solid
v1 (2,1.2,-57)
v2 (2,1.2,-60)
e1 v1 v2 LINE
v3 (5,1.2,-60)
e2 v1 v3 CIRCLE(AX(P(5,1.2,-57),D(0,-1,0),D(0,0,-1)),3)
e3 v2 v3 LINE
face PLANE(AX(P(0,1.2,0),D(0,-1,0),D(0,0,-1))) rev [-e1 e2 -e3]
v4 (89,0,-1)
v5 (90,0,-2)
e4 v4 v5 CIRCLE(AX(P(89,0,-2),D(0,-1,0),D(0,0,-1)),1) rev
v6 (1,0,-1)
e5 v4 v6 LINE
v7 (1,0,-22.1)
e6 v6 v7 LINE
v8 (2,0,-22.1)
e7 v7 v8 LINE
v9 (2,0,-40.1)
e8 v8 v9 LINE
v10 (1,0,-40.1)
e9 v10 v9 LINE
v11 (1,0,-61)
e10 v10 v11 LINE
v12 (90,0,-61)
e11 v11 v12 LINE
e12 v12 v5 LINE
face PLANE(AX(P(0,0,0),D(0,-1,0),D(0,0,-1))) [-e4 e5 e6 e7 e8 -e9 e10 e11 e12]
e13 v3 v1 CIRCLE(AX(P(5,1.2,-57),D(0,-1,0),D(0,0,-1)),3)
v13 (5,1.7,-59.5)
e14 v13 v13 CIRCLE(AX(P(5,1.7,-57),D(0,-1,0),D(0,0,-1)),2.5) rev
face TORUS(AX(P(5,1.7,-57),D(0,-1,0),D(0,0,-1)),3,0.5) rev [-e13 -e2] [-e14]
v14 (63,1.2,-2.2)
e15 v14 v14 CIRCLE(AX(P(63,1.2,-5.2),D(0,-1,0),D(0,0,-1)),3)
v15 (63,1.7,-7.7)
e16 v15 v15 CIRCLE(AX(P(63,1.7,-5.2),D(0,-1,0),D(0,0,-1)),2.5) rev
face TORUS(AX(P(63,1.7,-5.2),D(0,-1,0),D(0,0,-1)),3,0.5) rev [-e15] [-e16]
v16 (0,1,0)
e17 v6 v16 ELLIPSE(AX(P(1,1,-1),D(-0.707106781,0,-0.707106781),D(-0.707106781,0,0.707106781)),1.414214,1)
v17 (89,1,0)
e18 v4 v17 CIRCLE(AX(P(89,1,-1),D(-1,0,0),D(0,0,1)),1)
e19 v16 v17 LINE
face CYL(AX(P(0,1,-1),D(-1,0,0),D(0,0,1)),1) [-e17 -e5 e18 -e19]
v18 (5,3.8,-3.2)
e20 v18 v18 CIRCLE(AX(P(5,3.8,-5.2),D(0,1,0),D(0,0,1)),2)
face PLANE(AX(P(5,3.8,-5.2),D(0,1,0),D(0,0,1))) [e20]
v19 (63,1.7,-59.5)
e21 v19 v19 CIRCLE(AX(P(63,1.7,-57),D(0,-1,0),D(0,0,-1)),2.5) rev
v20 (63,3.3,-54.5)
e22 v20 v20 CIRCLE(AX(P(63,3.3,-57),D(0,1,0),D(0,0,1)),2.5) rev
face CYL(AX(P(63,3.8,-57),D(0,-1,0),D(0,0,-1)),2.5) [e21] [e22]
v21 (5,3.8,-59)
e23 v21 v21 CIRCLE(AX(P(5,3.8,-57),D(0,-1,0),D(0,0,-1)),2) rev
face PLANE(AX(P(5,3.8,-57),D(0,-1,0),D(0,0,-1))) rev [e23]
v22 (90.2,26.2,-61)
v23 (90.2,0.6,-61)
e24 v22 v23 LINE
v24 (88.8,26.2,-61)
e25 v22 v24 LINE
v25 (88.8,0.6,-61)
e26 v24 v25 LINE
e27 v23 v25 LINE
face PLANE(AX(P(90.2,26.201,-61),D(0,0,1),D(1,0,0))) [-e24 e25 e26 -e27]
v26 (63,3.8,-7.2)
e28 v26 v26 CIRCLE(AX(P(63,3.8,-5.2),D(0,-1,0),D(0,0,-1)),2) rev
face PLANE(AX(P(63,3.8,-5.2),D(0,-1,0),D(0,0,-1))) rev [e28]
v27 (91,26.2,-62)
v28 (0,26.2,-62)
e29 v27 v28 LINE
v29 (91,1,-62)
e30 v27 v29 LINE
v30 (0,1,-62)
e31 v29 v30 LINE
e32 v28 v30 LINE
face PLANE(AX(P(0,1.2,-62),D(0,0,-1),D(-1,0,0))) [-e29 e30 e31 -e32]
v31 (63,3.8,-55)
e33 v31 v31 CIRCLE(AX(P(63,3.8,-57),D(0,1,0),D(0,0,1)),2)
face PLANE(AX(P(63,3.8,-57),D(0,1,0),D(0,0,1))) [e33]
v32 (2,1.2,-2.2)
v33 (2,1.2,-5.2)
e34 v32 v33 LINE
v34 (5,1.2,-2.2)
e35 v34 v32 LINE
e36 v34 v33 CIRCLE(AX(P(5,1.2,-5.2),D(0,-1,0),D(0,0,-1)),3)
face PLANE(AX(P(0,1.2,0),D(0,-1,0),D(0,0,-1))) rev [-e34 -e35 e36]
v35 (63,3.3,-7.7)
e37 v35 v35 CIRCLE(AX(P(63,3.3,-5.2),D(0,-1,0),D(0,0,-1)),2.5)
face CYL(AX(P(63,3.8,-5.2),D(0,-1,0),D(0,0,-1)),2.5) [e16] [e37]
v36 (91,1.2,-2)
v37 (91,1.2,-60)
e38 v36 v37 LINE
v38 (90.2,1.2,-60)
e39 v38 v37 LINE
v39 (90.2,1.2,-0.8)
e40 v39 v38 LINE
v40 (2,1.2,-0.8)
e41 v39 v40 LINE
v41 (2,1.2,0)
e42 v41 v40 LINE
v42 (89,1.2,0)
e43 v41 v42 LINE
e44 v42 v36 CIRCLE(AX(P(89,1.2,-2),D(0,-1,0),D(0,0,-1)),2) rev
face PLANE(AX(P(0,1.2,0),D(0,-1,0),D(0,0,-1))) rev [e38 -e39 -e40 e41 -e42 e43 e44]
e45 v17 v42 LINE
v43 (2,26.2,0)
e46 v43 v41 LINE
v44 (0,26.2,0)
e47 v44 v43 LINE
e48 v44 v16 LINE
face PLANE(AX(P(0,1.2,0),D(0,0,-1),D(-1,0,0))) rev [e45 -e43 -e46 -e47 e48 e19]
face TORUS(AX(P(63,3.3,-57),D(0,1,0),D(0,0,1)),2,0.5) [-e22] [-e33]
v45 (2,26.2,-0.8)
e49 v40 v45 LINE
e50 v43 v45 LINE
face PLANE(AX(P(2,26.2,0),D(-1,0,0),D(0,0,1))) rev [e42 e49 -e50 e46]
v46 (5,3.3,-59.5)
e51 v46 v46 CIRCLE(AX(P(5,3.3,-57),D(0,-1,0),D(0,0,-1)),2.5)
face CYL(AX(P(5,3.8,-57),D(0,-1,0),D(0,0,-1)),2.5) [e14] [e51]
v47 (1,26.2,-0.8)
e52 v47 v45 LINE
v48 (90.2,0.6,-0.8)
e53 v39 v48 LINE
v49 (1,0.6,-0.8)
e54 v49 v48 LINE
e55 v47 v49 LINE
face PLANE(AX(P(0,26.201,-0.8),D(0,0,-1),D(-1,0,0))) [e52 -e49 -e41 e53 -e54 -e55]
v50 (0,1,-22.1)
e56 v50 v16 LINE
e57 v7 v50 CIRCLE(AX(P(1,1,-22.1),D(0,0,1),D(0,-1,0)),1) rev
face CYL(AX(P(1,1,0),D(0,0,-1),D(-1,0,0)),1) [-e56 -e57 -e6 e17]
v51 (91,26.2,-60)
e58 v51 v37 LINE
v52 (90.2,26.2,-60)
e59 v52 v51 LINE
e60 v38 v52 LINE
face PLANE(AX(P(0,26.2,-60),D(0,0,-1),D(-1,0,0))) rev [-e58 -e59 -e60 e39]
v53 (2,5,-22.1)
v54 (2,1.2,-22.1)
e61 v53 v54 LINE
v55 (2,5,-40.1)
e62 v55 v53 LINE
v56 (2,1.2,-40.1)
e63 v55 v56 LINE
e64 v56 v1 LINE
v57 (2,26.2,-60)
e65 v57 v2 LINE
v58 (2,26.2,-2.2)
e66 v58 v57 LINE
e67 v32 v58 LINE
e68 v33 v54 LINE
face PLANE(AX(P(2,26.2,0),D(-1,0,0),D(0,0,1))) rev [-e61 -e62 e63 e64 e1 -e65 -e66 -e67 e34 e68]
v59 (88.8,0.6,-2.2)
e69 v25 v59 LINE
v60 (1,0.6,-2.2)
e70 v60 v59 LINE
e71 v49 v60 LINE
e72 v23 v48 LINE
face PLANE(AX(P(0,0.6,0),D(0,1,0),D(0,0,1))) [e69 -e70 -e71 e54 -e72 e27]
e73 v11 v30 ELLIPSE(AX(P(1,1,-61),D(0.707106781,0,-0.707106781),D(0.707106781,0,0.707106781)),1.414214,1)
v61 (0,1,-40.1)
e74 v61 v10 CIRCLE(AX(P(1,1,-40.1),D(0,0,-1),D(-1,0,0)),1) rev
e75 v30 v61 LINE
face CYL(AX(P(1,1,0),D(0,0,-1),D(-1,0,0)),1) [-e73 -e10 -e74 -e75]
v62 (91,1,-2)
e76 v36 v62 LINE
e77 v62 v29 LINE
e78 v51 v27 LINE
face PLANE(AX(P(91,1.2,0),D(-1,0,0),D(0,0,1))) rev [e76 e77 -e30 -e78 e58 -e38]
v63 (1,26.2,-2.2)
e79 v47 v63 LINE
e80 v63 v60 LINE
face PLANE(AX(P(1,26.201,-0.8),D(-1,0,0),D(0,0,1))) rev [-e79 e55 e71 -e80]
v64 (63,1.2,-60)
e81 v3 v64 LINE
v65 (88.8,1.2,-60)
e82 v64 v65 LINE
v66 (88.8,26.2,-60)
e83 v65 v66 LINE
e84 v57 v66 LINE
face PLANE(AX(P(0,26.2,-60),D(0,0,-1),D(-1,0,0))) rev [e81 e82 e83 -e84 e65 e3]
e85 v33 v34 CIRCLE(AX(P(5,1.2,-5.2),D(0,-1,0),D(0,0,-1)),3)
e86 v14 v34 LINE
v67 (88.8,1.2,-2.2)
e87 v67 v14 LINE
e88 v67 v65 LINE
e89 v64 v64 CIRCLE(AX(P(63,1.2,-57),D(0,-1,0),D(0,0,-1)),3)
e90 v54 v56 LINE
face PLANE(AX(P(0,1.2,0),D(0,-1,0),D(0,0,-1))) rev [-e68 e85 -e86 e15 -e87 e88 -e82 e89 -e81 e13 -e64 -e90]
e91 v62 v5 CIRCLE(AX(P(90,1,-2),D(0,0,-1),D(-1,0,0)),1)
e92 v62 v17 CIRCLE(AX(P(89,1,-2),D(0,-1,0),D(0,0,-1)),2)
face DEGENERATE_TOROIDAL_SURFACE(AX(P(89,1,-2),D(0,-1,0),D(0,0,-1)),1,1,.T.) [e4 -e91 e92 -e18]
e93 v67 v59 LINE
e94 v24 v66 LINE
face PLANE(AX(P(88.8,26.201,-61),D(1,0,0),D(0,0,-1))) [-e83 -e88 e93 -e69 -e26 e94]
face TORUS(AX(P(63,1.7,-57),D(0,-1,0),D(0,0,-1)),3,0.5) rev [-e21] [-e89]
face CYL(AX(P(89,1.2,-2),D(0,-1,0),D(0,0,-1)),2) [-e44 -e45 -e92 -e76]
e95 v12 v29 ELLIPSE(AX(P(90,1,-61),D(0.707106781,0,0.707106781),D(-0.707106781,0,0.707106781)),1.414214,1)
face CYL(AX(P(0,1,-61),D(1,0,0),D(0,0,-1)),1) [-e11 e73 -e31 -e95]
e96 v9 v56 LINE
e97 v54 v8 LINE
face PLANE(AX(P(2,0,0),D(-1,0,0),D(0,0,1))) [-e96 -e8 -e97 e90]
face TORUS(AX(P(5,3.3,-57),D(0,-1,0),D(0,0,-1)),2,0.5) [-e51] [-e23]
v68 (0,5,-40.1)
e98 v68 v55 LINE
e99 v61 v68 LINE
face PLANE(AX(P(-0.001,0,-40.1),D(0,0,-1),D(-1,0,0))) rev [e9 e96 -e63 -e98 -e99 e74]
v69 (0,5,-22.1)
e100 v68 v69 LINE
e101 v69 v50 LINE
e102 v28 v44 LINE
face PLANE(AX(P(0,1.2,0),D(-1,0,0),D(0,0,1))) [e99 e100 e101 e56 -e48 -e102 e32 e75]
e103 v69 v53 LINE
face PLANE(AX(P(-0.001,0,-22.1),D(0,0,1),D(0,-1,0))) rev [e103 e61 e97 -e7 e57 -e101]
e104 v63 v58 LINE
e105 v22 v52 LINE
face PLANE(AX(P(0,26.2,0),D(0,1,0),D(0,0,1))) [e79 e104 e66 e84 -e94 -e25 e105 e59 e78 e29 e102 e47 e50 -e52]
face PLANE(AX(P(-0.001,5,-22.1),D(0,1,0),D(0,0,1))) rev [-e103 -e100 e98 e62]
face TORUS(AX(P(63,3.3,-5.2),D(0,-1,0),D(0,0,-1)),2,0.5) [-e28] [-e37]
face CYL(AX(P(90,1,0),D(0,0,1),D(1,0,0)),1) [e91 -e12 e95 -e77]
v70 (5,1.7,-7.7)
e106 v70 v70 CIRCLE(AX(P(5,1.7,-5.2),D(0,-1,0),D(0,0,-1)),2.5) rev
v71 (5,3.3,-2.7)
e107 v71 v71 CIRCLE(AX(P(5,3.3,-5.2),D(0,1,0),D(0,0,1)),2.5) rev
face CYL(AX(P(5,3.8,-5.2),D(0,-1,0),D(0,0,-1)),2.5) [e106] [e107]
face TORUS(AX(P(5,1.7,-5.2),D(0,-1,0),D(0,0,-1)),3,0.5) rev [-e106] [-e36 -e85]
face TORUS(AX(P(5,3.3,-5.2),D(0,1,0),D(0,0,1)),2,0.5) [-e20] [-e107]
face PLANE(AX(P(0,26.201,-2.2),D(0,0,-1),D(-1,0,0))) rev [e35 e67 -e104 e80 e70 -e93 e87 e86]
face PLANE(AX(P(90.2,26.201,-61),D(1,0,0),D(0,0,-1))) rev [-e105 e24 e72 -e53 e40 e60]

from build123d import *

# Parameters (mm, degrees)
SKICA1_W                 = 91
SKICA1_H                 = 62
P_IDAT_VYSUNUT_M5_DEPTH  = 1.2
P_IDAT_VYSUNUT_M8_DEPTH  = 25
ODEBRAT_START            = -0.6
SKICA13_W                = 87.8
SKICA13_H                = 1.4
ODEBRAT_VYSUNUT_M2_DEPTH = 25.6
CUT_EXTRUDE2_REACH       = 113.586
SKETCH2_W                = 18
SKETCH2_H                = 5
SKETCH4_R                = 2.5
ODEBRAT_VYSUNUT_M6_DEPTH = 0.4
BOSS_EXTRUDE3_START      = 3
SKETCH17_R               = 2.5
BOSS_EXTRUDE3_DEPTH      = 3
FILLET24_R               = 0.5
FILLET25_R               = 0.5
FILLET2_R                = 1
FILLET5_R                = 2


# Some blends are built 0.0001 mm under size
with BuildPart() as part:
    # Skica1 → Přidat vysunutím5 (new body)
    with BuildSketch(Plane(origin=(0, 0, 0), x_dir=(1, 0, 0), z_dir=(0, 1, 0))):
        with Locations((45.5, 31)):
            Rectangle(SKICA1_W, SKICA1_H)
    extrude(amount=P_IDAT_VYSUNUT_M5_DEPTH)

    # Skica5 → Přidat vysunutím8 (add)
    with BuildSketch(Plane(origin=(0, 1.2, 0), x_dir=(1, 0, 0), z_dir=(0, 1, 0))):
        Polygon((0, 62), (0, 0), (2, 0), (2, 60), (91, 60), (91, 62), align=None)
    extrude(amount=P_IDAT_VYSUNUT_M8_DEPTH)

    # Skica13 → Odebrat vysunutím2 (cut)
    with BuildSketch(Plane(origin=(0, 1.2, 0), x_dir=(1, 0, 0), z_dir=(0, 1, 0)).offset(ODEBRAT_START)):
        with Locations((44.9, 1.5)):
            Rectangle(SKICA13_W, SKICA13_H)
        Polygon((88.8, 2.2), (88.8, 0.8), (90.2, 0.8), (90.2, 61), (88.8, 61), align=None)
    extrude(amount=ODEBRAT_VYSUNUT_M2_DEPTH, mode=Mode.SUBTRACT)

    # Sketch2 → Cut-Extrude2 (cut, up to next)
    with BuildSketch(Plane(origin=(2, 0, 0), x_dir=(0, 0, -1), z_dir=(1, 0, 0)), mode=Mode.PRIVATE) as cut_extrude2_sk1:
        with Locations((31.1, 2.5)):
            Rectangle(SKETCH2_W, SKETCH2_H)
    cut_extrude2_tool1 = extrude(cut_extrude2_sk1.sketch, amount=-CUT_EXTRUDE2_REACH, mode=Mode.PRIVATE) & part.part
    add(cut_extrude2_tool1.solids().sort_by_distance((2, 2.5, -31.1))[0], mode=Mode.SUBTRACT)

    # Sketch4 → Odebrat vysunutím6 (cut)
    with BuildSketch(Plane(origin=(0, 1.2, 0), x_dir=(1, 0, 0), z_dir=(0, 1, 0))):
        with Locations(Location((63, 5.2, 0), (0, 0, 270))):
            Circle(SKETCH4_R)
        with Locations(Location((63, 57, 0), (0, 0, 90))):
            Circle(SKETCH4_R)
        with Locations(Location((5, 5.2, 0), (0, 0, 270))):
            Circle(SKETCH4_R)
        with Locations(Location((5, 57, 0), (0, 0, 90))):
            Circle(SKETCH4_R)
    extrude(amount=-ODEBRAT_VYSUNUT_M6_DEPTH, mode=Mode.SUBTRACT)

    # Sketch17 → Boss-Extrude3 (add)
    with BuildSketch(Plane(origin=(0, 0.8, 0), x_dir=(1, 0, 0), z_dir=(0, 1, 0)).offset(BOSS_EXTRUDE3_START)):
        with Locations(Location((5, 5.2, 0), (0, 0, 270))):
            Circle(SKETCH17_R)
        with Locations(Location((5, 57, 0), (0, 0, 90))):
            Circle(SKETCH17_R)
        with Locations(Location((63, 57, 0), (0, 0, 90))):
            Circle(SKETCH17_R)
        with Locations(Location((63, 5.2, 0), (0, 0, 90))):
            Circle(SKETCH17_R)
    extrude(amount=-BOSS_EXTRUDE3_DEPTH)

    # Fillet24
    fillet24_edges = [part.edges().sort_by_distance(p)[0] for p in [
        (63, 1.2, -54.5),
        (5, 1.2, -7.7),
        (5, 1.2, -54.5),
        (63, 1.2, -2.7),
    ]]
    fillet(fillet24_edges, radius=FILLET24_R - 0.0001)  # a hair under: the kernel refuses the full size

    # Fillet25
    fillet25_edges = [part.edges().sort_by_distance(p)[0] for p in [
        (5, 3.8, -54.5),
        (63, 3.8, -54.5),
        (63, 3.8, -2.7),
        (5, 3.8, -7.7),
    ]]
    fillet(fillet25_edges, radius=FILLET25_R)

    # Fillet2
    fillet2_edges = [part.edges().sort_by_distance(p)[0] for p in [
        (45.5, 0, 0),
        (91, 0, -31),
        (45.5, 0, -62),
        (0, 0, -11.05),
        (0, 0, -51.05),
    ]]
    fillet(fillet2_edges, radius=FILLET2_R)

    # Fillet5
    # the kernel refuses this fillet: 2 mm, written as the material it takes off along each edge
    with BuildSketch(Plane(origin=(89, 0, -2), x_dir=(1, 0, 0), z_dir=(0, 0, -1))) as fillet5_piece_1:
        with BuildLine():
            CenterArc((1, -1), 1, 0, 90)
            Line((2, -1), (2, 0))
            Line((2, 0), (1, 0))
        make_face()
    revolve(axis=Axis((89, 0, -2), (0, -1, 0)), revolution_arc=90, mode=Mode.SUBTRACT)
    with BuildSketch(Plane(origin=(91, 0, 0), x_dir=(-1, 0, 0), z_dir=(0, 1, 0))) as fillet5_piece_2:
        with BuildLine():
            CenterArc((FILLET5_R, -FILLET5_R), FILLET5_R, 90, 90)
            Line((0, -FILLET5_R), (0, 0))
            Line((0, 0), (FILLET5_R, 0))
        make_face()
    extrude(amount=6.2, mode=Mode.SUBTRACT)


solid = part.part
